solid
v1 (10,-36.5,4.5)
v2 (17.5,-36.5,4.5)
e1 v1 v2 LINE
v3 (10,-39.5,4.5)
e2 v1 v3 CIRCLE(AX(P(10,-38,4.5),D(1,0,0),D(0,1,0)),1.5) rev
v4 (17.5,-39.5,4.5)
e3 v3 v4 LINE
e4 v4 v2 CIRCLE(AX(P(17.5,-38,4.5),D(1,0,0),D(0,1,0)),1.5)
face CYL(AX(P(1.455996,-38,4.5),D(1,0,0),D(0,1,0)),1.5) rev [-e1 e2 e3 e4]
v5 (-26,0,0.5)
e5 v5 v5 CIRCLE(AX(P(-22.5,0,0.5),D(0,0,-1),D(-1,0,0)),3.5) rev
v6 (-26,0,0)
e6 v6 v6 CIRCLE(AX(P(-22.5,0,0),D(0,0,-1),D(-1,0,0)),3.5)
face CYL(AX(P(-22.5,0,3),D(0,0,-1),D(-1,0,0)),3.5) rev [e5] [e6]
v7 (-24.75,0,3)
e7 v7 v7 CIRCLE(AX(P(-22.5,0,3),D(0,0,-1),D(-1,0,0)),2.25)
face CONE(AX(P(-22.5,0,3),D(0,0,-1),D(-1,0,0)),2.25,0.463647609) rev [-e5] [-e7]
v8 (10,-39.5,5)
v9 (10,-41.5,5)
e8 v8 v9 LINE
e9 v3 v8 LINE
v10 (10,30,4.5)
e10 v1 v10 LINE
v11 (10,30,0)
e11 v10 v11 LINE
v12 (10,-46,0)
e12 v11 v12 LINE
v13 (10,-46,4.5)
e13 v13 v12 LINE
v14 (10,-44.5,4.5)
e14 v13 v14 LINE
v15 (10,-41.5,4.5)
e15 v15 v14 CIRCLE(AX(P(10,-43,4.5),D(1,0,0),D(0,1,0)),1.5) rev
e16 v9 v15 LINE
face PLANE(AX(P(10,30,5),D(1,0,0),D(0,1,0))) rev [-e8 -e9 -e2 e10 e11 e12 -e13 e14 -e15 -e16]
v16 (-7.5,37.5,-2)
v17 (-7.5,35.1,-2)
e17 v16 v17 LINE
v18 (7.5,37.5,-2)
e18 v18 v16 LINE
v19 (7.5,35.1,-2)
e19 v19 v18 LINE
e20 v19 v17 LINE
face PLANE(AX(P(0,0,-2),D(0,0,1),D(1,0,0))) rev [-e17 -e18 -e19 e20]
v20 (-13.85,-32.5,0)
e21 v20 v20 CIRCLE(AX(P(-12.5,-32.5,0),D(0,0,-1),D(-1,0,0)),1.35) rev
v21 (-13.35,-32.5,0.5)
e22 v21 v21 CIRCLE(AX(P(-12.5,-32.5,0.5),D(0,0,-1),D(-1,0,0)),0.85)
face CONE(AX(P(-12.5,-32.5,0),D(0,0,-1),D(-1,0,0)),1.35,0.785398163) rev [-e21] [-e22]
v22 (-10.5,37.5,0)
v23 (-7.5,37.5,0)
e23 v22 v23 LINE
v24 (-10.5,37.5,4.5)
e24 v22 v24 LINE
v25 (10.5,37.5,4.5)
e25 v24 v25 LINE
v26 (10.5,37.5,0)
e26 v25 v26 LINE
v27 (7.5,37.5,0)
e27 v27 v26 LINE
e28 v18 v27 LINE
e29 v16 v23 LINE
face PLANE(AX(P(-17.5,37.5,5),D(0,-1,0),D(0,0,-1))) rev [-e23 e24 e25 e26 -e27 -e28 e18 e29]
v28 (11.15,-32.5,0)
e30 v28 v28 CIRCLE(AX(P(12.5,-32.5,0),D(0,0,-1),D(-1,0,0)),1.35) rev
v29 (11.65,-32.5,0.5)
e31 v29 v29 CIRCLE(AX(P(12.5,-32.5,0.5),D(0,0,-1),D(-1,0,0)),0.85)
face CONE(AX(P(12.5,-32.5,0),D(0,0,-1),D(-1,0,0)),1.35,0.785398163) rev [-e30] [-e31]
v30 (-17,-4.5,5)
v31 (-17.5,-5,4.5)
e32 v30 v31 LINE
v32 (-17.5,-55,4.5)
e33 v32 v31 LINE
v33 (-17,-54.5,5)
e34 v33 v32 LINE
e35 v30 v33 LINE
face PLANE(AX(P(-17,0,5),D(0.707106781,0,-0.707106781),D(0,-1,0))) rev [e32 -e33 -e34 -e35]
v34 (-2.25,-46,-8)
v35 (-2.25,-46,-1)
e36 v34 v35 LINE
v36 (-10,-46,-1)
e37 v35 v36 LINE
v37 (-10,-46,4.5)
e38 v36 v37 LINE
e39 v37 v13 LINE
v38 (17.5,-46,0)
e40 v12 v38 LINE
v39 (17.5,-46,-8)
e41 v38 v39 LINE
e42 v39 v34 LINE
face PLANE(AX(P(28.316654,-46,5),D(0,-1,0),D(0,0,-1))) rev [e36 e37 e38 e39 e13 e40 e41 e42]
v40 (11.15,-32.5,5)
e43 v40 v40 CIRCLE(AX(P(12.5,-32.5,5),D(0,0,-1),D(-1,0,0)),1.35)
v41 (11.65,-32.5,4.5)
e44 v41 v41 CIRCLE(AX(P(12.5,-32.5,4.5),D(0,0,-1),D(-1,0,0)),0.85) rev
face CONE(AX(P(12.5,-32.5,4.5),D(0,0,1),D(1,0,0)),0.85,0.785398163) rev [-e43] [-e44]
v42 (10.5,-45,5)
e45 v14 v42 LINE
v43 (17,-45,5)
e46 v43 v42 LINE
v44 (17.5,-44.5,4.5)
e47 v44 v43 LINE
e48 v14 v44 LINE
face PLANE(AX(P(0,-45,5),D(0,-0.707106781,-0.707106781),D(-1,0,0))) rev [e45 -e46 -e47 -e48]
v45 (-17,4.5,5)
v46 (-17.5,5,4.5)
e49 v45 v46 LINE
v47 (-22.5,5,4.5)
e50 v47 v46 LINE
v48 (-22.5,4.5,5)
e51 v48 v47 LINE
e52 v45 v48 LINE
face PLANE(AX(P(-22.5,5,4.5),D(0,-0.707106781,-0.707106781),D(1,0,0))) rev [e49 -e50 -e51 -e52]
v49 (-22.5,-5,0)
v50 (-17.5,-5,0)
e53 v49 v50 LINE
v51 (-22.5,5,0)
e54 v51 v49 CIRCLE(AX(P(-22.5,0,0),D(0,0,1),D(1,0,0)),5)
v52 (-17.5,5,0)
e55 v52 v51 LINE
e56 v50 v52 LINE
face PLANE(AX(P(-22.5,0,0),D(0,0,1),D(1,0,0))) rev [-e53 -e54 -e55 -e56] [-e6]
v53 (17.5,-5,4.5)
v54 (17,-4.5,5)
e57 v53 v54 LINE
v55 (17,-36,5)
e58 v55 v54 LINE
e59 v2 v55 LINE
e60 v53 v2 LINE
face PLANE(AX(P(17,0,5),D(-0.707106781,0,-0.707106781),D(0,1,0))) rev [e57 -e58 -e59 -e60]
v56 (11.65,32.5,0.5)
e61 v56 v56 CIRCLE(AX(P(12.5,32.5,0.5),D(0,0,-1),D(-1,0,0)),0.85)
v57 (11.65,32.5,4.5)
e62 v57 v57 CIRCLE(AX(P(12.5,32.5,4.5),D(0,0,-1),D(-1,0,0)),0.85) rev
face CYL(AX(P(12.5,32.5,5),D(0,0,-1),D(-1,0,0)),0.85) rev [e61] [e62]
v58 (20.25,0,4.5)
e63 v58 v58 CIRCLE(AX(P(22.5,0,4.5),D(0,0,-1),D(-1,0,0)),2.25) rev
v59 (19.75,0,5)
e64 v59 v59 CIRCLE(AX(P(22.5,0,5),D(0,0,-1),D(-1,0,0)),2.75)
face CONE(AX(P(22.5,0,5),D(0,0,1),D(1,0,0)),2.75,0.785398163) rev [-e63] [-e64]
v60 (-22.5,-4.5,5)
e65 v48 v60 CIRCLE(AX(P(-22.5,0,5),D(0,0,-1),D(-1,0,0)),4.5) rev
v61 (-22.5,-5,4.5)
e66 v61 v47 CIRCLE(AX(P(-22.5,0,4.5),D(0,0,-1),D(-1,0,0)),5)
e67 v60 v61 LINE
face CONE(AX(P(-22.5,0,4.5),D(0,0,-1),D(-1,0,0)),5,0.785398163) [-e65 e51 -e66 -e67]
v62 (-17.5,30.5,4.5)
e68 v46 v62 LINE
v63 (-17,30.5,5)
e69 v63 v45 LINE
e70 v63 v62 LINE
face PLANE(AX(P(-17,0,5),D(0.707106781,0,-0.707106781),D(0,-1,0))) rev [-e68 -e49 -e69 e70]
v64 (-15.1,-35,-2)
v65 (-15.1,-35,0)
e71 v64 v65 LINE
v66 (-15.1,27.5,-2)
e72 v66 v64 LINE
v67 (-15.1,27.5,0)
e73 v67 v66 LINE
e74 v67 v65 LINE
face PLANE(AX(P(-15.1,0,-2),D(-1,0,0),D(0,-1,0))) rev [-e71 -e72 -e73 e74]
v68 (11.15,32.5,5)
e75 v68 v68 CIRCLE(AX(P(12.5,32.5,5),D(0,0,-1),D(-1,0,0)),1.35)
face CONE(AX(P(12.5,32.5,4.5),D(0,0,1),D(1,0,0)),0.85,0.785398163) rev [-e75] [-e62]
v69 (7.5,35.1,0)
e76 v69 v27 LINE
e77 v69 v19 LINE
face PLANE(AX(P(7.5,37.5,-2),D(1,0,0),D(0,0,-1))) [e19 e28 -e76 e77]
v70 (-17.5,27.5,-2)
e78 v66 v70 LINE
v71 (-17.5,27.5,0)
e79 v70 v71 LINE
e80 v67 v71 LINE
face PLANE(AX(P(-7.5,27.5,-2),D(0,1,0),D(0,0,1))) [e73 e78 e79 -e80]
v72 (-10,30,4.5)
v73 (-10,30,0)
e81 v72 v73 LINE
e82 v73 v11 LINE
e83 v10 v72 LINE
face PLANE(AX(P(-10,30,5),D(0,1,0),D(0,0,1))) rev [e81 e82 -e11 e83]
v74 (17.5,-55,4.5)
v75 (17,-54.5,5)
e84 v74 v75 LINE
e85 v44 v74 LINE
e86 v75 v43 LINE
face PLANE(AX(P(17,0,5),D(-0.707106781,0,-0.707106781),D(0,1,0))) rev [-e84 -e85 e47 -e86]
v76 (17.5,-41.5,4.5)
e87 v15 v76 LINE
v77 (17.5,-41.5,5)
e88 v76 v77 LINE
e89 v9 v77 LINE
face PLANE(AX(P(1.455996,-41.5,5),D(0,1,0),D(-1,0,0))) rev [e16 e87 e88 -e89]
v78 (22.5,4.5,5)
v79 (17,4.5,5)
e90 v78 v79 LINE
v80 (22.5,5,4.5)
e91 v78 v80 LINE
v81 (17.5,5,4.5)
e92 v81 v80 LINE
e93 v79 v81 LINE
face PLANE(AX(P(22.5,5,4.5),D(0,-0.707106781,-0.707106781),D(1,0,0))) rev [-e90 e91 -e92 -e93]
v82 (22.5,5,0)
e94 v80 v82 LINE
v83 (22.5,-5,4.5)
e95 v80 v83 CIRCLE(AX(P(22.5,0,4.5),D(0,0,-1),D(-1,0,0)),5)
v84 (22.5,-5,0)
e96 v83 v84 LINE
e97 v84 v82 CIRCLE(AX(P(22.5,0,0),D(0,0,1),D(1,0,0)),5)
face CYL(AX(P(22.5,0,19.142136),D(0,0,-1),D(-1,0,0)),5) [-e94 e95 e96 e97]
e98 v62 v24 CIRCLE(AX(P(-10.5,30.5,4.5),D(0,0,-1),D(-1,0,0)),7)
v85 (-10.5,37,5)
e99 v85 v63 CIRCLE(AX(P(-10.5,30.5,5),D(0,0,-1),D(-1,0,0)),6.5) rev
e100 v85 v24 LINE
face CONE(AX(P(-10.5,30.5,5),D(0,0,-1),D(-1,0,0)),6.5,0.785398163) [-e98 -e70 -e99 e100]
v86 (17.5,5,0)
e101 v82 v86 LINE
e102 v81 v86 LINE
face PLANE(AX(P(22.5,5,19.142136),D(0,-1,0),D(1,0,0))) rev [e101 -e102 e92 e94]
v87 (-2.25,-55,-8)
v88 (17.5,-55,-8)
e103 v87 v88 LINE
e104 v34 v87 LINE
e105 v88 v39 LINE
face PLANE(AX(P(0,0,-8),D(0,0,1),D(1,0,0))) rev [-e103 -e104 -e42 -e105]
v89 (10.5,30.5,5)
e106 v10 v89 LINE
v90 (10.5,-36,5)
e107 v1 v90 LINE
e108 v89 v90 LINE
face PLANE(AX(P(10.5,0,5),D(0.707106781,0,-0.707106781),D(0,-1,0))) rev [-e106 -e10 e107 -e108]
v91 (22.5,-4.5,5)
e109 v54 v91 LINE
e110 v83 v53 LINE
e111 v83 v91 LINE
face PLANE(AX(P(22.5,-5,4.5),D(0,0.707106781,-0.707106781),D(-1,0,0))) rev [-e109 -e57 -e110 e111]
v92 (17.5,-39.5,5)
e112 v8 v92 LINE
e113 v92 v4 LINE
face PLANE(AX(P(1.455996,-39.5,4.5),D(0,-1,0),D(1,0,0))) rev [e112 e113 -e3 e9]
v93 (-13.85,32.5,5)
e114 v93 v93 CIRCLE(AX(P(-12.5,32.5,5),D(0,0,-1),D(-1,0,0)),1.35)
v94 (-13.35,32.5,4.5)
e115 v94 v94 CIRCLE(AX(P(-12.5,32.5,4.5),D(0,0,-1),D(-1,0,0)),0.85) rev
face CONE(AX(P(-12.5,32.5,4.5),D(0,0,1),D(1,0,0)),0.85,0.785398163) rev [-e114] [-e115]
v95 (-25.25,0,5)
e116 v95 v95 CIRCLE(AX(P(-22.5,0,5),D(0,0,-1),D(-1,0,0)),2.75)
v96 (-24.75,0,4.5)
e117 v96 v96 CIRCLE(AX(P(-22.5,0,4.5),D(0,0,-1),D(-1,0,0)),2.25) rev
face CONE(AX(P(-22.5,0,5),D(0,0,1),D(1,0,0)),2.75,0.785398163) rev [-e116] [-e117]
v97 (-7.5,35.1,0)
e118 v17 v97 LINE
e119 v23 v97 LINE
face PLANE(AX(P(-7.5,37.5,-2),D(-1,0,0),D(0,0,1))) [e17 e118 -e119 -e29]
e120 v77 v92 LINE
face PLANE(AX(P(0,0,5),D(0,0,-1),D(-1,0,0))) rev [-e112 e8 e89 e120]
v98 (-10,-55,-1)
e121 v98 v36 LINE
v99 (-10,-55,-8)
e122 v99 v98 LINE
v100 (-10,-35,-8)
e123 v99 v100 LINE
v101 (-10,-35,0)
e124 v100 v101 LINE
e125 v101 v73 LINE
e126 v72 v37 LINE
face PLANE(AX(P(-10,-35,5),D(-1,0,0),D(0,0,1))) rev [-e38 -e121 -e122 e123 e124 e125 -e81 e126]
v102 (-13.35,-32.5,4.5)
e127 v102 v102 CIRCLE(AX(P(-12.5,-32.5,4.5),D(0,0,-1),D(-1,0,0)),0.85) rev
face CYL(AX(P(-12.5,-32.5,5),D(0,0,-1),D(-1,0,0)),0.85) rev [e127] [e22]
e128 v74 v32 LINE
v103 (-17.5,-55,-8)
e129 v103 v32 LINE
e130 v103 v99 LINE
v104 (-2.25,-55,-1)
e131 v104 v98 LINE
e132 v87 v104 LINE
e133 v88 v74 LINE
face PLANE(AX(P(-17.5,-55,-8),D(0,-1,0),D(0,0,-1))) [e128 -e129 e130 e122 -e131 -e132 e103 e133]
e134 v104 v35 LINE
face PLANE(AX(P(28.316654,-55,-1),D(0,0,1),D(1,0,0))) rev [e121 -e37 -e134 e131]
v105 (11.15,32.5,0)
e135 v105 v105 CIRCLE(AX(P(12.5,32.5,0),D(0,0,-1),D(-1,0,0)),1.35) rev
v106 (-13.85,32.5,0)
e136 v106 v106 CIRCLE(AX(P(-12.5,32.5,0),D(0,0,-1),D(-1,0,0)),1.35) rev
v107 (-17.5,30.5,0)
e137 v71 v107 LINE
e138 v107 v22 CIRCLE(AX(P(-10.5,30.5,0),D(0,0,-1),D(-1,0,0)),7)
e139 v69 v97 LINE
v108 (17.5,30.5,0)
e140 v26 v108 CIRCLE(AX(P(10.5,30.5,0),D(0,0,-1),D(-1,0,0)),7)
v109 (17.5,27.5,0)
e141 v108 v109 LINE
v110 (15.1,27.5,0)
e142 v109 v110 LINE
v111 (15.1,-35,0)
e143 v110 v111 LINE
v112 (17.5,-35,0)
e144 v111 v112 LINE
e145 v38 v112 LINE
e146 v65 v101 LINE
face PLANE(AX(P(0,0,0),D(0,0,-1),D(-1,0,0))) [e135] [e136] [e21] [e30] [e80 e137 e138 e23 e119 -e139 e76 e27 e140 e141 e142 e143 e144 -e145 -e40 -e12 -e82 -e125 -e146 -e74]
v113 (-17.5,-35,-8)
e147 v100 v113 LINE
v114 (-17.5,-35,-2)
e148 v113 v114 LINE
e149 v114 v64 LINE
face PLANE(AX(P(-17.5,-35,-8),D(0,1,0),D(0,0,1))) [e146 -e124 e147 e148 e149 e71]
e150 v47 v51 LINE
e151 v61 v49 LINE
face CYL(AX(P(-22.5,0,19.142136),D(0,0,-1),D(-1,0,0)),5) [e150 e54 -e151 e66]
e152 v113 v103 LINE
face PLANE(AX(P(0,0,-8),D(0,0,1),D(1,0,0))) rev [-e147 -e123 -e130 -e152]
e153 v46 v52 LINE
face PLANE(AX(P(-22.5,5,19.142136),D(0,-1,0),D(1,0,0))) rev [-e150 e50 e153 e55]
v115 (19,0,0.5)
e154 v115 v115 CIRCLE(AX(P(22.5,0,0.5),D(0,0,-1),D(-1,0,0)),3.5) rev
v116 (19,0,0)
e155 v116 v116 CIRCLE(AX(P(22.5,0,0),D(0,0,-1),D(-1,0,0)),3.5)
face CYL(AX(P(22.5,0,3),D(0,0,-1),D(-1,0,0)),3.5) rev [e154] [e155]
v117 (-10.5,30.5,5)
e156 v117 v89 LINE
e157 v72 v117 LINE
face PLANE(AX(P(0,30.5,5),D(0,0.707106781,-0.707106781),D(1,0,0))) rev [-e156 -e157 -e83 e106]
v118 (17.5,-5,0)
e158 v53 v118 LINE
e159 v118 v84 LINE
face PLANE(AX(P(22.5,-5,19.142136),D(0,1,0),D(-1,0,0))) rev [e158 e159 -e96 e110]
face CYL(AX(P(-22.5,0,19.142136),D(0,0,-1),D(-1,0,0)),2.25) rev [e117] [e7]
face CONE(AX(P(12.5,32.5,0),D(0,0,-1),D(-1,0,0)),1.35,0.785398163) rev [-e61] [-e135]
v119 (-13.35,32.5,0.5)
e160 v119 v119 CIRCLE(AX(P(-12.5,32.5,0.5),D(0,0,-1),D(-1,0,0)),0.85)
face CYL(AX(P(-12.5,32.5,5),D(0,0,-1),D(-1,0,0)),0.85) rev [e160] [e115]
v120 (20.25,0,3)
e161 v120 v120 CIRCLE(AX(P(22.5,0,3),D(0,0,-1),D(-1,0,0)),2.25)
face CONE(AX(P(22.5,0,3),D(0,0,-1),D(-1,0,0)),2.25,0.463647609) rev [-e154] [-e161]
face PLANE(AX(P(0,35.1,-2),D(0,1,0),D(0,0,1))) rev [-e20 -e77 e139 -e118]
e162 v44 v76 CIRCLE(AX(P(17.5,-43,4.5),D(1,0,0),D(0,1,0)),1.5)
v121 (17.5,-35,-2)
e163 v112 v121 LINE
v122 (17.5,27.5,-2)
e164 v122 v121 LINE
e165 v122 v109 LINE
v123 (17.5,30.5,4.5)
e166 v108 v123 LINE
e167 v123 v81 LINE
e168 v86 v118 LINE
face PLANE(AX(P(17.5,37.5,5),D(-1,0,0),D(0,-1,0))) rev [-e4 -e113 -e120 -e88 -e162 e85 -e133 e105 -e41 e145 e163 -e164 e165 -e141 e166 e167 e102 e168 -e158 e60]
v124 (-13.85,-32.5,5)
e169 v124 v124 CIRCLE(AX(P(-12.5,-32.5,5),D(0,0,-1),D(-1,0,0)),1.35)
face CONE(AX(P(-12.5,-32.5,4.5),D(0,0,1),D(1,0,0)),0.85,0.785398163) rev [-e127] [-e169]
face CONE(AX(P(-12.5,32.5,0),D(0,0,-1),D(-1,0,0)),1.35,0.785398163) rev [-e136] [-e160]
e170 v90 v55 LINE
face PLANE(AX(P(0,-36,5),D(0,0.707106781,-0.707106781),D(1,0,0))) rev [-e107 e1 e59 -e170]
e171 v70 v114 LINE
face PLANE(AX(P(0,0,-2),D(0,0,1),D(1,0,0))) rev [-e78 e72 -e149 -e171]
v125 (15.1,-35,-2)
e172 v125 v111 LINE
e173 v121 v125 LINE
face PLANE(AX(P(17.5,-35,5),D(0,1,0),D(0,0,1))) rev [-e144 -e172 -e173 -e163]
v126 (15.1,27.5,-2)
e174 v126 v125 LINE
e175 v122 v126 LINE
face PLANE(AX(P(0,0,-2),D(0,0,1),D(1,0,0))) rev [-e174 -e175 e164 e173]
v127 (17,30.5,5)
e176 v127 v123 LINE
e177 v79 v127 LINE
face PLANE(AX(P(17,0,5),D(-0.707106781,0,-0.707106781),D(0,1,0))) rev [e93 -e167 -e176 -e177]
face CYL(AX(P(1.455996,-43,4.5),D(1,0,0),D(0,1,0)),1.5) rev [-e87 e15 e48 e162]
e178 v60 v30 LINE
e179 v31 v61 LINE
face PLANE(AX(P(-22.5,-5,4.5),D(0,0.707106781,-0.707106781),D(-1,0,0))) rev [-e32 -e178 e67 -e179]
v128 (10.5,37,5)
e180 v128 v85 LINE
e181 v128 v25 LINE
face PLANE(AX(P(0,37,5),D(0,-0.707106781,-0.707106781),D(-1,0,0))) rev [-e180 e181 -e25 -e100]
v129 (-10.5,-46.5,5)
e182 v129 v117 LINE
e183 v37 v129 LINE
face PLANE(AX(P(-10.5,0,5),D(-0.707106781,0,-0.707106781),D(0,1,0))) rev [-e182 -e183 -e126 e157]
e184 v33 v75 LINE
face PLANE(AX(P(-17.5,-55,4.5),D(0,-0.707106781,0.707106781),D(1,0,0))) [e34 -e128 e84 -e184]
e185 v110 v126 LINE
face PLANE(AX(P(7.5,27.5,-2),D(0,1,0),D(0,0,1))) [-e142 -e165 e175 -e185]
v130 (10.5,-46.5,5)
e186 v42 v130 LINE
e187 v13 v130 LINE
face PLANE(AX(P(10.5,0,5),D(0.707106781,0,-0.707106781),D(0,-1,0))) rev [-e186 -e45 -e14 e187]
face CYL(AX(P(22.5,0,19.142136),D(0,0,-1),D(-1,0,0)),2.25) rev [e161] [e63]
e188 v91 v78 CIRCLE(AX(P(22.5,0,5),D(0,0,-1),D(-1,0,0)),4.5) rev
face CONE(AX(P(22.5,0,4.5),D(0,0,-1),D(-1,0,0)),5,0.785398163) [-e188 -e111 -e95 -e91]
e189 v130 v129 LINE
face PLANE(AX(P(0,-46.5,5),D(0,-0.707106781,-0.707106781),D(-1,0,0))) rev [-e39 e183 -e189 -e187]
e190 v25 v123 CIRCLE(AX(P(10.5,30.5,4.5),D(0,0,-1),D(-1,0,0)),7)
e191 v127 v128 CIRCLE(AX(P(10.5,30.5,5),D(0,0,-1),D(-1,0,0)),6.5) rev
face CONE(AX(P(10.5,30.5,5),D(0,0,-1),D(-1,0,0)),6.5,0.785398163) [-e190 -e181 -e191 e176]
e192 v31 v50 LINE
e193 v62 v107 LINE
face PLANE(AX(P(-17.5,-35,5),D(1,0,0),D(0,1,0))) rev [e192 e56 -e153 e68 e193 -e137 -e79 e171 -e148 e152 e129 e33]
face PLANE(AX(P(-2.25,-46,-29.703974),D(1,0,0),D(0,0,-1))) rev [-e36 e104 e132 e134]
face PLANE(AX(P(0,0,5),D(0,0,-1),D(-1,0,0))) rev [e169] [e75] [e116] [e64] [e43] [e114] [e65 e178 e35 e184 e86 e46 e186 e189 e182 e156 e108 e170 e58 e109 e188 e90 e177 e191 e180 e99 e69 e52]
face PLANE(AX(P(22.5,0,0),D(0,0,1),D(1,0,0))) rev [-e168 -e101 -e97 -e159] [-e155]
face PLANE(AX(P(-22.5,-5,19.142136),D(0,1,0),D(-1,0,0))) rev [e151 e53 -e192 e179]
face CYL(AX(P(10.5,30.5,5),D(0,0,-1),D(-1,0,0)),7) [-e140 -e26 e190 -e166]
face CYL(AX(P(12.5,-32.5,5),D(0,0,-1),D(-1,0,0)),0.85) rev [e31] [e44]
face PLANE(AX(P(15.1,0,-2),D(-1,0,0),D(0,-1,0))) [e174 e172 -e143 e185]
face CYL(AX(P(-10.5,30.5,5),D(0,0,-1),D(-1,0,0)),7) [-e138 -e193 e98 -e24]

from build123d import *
from OCP.BRepFilletAPI import BRepFilletAPI_MakeChamfer

# Parameters (mm, degrees)
SKETCH1_R                = 0.85
BOSS_EXTRUDE1_DEPTH      = 5
BOSS_EXTRUDE2_DEPTH      = 2
SKETCH3_R                = 2.25
BOSS_EXTRUDE3_DEPTH      = 5
SKETCH4_R                = 3.5
CUT_EXTRUDE1_DEPTH       = 3
SKETCH5_W                = 10
SKETCH5_H                = 10
CUT_EXTRUDE2_DEPTH       = 47.770717335
FILLET1_R                = 7
BOSS_EXTRUDE4_DEPTH      = 5
BOSS_EXTRUDE4_DEPTH_BACK = 8
SKETCH6_W                = 7.5
SKETCH6_H                = 20
SKETCH7_W                = 6
SKETCH7_H                = 9
BOSS_EXTRUDE5_DEPTH      = 27.5
SKETCH8_W                = 19.75
SKETCH8_H                = 9
BOSS_EXTRUDE6_DEPTH      = 7
SKETCH9_W                = 7.5
SKETCH9_H                = 5
BOSS_EXTRUDE7_DEPTH      = 11
CUT_EXTRUDE3_DEPTH       = 7.5
CHAMFER3_SIZE            = 0.5
CHAMFER1_SIZE            = 2.5
CHAMFER1_SIZE_2          = 1.25


with BuildPart() as part:
    # Sketch1 → Boss-Extrude1 (new body)
    with BuildSketch(Plane.XY):
        Polygon((-10, -35), (-10, 30), (10, 30), (10, -35), (17.5, -35), (17.5, 37.5), (-17.5, 37.5), (-17.5, -35), align=None)
        with Locations((-12.5, 32.5)):
            Circle(SKETCH1_R, mode=Mode.SUBTRACT)
        with Locations((12.5, 32.5)):
            Circle(SKETCH1_R, mode=Mode.SUBTRACT)
        with Locations((-12.5, -32.5)):
            Circle(SKETCH1_R, mode=Mode.SUBTRACT)
        with Locations((12.5, -32.5)):
            Circle(SKETCH1_R, mode=Mode.SUBTRACT)
    extrude(amount=BOSS_EXTRUDE1_DEPTH)

    # Sketch2 → Boss-Extrude2 (add)
    with BuildSketch(Plane.XY):
        Polygon((17.5, -35), (17.5, 37.5), (-17.5, 37.5), (-17.5, -35), (-15.1, -35), (-15.1, 35.1), (15.1, 35.1), (15.1, -35), align=None)
    extrude(amount=-BOSS_EXTRUDE2_DEPTH)

    # Sketch3 → Boss-Extrude3 (add)
    # profile 1 of 2: a face of its own
    with BuildSketch(Plane.XY):
        with BuildLine():
            Line((22.5, 5), (17.5, 5))
            Line((17.5, 5), (17.5, -5))
            Line((17.5, -5), (22.5, -5))
            ThreePointArc((22.5, -5), (27.5, 0), (22.5, 5))
        make_face()
        with Locations(Location((22.5, 0, 0), (0, 0, 180))):
            Circle(SKETCH3_R, mode=Mode.SUBTRACT)
    # profile 2 of 2: a face of its own
    with BuildSketch(Plane.XY):
        with BuildLine():
            Line((-22.5, 5), (-17.5, 5))
            Line((-17.5, 5), (-17.5, -5))
            Line((-17.5, -5), (-22.5, -5))
            ThreePointArc((-22.5, -5), (-27.5, 0), (-22.5, 5))
        make_face()
        with Locations(Location((-22.5, 0, 0), (0, 0, 180))):
            Circle(SKETCH3_R, mode=Mode.SUBTRACT)
    extrude(amount=BOSS_EXTRUDE3_DEPTH)

    # Sketch4 → Cut-Extrude1 (cut)
    with BuildSketch(Plane(origin=(0, 0, 0), x_dir=(-1, 0, 0), z_dir=(0, 0, -1))):
        with Locations((-22.5, 0)):
            Circle(SKETCH4_R)
        with Locations((22.5, 0)):
            Circle(SKETCH4_R)
    extrude(amount=-CUT_EXTRUDE1_DEPTH, mode=Mode.SUBTRACT)

    # Sketch5 → Cut-Extrude2 (cut, through all)
    with BuildSketch(Plane(origin=(0, 0, 0), x_dir=(-1, 0, 0), z_dir=(0, 0, -1))):
        with Locations((-12.5, 32.5)):
            Rectangle(SKETCH5_W, SKETCH5_H)
        with Locations((12.5, 32.5)):
            Rectangle(SKETCH5_W, SKETCH5_H)
    extrude(amount=CUT_EXTRUDE2_DEPTH, mode=Mode.SUBTRACT)

    # Fillet1
    fillet1_edges = [part.edges().sort_by_distance(p)[0] for p in [
        (-17.5, 37.5, 2.5),
        (17.5, 37.5, 2.5),
    ]]
    fillet(fillet1_edges, radius=FILLET1_R)

    # Sketch6 → Boss-Extrude4 (add, two sides: drawn at the far end of the back side and taken through both)
    with BuildSketch(Plane.XY.offset(-BOSS_EXTRUDE4_DEPTH_BACK)):
        with Locations((-13.75, -45)):
            Rectangle(SKETCH6_W, SKETCH6_H)
    extrude(amount=BOSS_EXTRUDE4_DEPTH + BOSS_EXTRUDE4_DEPTH_BACK)

    # Sketch7 → Boss-Extrude5 (add)
    with BuildSketch(Plane(origin=(-10, 0, 0), x_dir=(0, 0, -1), z_dir=(1, 0, 0))):
        with Locations((-2, -50.5)):
            Rectangle(SKETCH7_W, SKETCH7_H)
    extrude(amount=BOSS_EXTRUDE5_DEPTH)

    # Sketch8 → Boss-Extrude6 (add)
    with BuildSketch(Plane(origin=(0, 0, -1), x_dir=(-1, 0, 0), z_dir=(0, 0, -1))):
        with Locations((-7.625, -50.5)):
            Rectangle(SKETCH8_W, SKETCH8_H)
    extrude(amount=BOSS_EXTRUDE6_DEPTH)

    # Sketch9 → Boss-Extrude7 (add)
    with BuildSketch(Plane.XZ.offset(35)):
        with Locations((13.75, 2.5)):
            Rectangle(SKETCH9_W, SKETCH9_H)
    extrude(amount=BOSS_EXTRUDE7_DEPTH)

    # Sketch10 → Cut-Extrude3 (cut)
    with BuildSketch(Plane(origin=(17.5, 0, 0), x_dir=(0, 0, -1), z_dir=(1, 0, 0))):
        with BuildLine():
            Line((-4.5, -36.5), (-6, -36.5))
            Line((-6, -36.5), (-6, -44.5))
            Line((-6, -44.5), (-4.5, -44.5))
            ThreePointArc((-4.5, -44.5), (-3, -43), (-4.5, -41.5))
            Line((-4.5, -41.5), (-5, -41.5))
            Line((-5, -41.5), (-5, -39.5))
            Line((-5, -39.5), (-4.5, -39.5))
            ThreePointArc((-4.5, -39.5), (-3, -38), (-4.5, -36.5))
        make_face()
    extrude(amount=-CUT_EXTRUDE3_DEPTH, mode=Mode.SUBTRACT)

    # Chamfer3
    chamfer3_edges = [part.edges().sort_by_distance(p)[0] for p in [
        (0, 30, 5),
        (-17.5, 17.75, 5),
        (0, 37.5, 5),
        (15.449747468, 35.449747468, 5),
        (-15.449747468, 35.449747468, 5),
        (10, -3.25, 5),
        (0, -55, 5),
        (-10, -8, 5),
        (0, -46, 5),
        (-13.35, 32.5, 0),
        (-13.35, 32.5, 5),
        (10, -45.25, 5),
        (17.5, -20.75, 5),
        (13.75, -44.5, 5),
        (13.75, -36.5, 5),
        (17.5, -49.75, 5),
        (11.65, 32.5, 0),
        (11.65, 32.5, 5),
        (-13.35, -32.5, 0),
        (-13.35, -32.5, 5),
        (11.65, -32.5, 0),
        (11.65, -32.5, 5),
        (17.5, 17.75, 5),
        (27.5, 0, 5),
        (20, 5, 5),
        (20, -5, 5),
        (24.75, 0, 5),
        (-17.5, -30, 5),
        (-27.5, 0, 5),
        (-20, -5, 5),
        (-20, 5, 5),
        (-20.25, 0, 5),
    ]]
    chamfer(chamfer3_edges, length=CHAMFER3_SIZE - 0.0001)  # a hair under: the kernel refuses the full size

    # Chamfer1
    chamfer1_edges_1 = [part.edges().sort_by_distance(p)[0] for p in [
        (26, 0, 3),
    ]]
    chamfer1_side_1 = [part.faces().sort_by_distance(p)[0] for p in [
        (26, 0, 2.975),
    ]]
    chamfer1_edges_2 = [part.edges().sort_by_distance(p)[0] for p in [
        (-19, 0, 3),
    ]]
    chamfer1_side_2 = [part.faces().sort_by_distance(p)[0] for p in [
        (-19, 0, 2.975),
    ]]
    chamfer1 = BRepFilletAPI_MakeChamfer(part.part.solid().wrapped)
    for e in chamfer1_edges_1:
        chamfer1.Add(CHAMFER1_SIZE - 0.0001, CHAMFER1_SIZE_2 - 0.0001, e.wrapped, chamfer1_side_1[0].wrapped)
    for e in chamfer1_edges_2:
        chamfer1.Add(CHAMFER1_SIZE - 0.0001, CHAMFER1_SIZE_2 - 0.0001, e.wrapped, chamfer1_side_2[0].wrapped)
    add(Compound.cast(chamfer1.Shape()), mode=Mode.REPLACE)  # a hair under: the kernel refuses the full size


solid = part.part
